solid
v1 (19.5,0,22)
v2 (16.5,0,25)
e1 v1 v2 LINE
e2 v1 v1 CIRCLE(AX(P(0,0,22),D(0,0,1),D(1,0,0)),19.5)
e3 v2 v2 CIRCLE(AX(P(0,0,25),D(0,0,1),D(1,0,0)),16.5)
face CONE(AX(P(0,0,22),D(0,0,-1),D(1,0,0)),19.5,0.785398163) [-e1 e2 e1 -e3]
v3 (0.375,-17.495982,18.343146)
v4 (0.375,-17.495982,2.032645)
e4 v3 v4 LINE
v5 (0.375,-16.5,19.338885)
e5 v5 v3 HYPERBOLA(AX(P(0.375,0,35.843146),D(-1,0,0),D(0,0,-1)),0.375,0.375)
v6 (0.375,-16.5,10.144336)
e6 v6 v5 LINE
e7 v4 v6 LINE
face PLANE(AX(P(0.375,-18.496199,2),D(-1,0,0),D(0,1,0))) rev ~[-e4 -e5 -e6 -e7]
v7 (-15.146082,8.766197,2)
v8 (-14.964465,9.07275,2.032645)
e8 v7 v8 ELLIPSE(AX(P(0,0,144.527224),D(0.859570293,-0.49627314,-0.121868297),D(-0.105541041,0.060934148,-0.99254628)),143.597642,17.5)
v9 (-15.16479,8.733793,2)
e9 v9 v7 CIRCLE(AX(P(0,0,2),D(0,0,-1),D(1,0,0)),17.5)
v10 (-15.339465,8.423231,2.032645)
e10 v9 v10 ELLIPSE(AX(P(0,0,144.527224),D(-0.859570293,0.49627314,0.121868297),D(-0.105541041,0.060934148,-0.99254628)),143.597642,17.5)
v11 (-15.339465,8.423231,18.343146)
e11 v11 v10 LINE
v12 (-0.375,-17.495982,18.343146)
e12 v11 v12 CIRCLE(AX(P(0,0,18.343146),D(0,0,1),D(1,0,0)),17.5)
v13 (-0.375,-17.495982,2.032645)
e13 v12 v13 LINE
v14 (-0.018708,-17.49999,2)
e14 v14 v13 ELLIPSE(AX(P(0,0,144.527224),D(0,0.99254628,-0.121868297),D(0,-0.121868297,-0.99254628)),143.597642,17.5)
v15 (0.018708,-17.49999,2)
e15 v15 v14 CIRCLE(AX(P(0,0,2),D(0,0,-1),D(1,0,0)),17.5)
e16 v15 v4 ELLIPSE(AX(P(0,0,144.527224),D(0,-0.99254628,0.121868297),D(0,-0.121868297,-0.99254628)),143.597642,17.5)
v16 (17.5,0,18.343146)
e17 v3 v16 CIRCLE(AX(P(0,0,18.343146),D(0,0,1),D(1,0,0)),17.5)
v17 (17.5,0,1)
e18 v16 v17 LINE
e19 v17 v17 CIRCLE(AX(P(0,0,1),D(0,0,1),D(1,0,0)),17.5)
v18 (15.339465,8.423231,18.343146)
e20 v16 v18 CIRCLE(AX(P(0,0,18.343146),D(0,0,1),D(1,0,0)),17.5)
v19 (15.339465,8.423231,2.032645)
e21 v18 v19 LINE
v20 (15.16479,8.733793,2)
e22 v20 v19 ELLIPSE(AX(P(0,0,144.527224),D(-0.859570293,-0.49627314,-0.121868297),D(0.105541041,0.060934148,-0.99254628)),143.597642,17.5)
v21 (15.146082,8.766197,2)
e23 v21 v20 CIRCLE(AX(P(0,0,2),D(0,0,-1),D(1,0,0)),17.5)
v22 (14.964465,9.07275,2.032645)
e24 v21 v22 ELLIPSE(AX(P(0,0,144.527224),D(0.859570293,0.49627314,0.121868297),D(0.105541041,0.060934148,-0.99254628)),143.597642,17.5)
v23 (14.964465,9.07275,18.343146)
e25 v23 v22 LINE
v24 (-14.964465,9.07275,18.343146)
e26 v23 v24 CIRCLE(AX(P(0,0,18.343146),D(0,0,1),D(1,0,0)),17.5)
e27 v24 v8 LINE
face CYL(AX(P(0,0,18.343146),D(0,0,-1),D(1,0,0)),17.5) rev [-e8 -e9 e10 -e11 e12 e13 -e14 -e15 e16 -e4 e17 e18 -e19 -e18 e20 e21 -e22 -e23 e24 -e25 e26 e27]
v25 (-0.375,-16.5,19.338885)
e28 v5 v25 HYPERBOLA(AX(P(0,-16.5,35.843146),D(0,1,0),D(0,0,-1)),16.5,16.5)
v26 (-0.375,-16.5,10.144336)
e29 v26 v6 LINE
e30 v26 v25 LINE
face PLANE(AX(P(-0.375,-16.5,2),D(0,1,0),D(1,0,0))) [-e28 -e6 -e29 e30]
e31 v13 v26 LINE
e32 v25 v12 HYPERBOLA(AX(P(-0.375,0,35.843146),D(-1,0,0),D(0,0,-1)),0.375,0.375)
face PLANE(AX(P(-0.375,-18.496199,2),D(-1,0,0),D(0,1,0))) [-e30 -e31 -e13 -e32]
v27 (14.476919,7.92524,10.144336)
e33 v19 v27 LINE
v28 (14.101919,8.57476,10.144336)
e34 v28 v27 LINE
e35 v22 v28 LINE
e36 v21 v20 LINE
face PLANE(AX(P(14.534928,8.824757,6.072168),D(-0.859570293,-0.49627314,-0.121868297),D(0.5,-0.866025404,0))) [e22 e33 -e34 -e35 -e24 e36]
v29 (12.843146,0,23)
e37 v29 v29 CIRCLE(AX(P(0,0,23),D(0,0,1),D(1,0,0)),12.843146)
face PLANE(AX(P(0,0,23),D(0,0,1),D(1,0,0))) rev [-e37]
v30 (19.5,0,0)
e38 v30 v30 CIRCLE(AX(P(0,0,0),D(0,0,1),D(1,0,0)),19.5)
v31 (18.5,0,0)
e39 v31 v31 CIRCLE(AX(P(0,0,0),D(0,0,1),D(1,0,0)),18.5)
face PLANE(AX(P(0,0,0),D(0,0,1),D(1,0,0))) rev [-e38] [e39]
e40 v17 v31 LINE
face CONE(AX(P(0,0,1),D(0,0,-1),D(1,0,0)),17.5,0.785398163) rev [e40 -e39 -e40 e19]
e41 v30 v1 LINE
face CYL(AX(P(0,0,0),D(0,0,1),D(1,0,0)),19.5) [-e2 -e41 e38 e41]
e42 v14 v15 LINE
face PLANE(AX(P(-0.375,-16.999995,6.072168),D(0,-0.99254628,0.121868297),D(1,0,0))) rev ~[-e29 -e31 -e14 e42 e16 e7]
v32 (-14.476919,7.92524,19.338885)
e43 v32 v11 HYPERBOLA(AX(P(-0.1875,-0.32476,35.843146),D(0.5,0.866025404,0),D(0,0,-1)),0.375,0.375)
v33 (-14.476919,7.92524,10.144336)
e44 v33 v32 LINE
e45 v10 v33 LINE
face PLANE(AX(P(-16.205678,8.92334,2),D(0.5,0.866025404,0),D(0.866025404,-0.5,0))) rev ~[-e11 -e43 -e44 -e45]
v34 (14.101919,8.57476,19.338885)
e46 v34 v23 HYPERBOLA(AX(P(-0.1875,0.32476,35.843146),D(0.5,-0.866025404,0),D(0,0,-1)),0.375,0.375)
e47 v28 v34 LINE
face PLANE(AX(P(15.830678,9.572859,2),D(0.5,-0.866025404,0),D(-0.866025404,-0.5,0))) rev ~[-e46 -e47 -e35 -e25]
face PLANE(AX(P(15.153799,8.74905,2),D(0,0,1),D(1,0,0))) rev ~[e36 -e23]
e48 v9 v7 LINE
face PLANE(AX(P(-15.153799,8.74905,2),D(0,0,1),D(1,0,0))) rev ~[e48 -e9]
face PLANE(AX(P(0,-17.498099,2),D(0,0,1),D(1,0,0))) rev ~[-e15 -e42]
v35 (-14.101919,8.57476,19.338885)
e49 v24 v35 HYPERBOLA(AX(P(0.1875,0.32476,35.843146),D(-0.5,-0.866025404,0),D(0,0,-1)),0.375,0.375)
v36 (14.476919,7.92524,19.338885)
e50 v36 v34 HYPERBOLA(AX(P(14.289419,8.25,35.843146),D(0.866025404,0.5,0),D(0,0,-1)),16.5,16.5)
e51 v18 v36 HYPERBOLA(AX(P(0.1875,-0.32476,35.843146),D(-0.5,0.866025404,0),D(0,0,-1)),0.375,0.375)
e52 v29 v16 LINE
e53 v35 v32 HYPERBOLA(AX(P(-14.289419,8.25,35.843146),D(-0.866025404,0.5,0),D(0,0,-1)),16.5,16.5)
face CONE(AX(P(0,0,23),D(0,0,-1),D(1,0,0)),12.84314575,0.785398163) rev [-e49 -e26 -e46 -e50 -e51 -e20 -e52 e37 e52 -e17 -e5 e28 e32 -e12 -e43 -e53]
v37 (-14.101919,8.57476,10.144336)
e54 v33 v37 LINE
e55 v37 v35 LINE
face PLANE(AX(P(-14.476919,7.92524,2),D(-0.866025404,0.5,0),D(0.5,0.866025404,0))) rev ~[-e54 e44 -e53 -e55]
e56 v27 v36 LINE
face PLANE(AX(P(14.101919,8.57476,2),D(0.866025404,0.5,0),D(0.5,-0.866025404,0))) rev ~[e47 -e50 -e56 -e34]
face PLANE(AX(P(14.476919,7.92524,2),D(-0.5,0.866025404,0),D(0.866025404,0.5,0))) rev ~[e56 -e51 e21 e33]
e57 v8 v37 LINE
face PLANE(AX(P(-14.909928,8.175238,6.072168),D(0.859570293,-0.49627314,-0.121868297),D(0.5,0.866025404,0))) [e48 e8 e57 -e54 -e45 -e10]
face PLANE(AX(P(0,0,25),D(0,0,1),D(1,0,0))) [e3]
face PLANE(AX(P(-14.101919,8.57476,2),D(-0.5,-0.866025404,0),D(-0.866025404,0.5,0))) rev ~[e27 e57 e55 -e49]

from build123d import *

# Parameters (mm, degrees)
F3_W       = 0.75
F3_H       = 1.9961989338
F5_SIZE2   = 8.144336
F5_SIZE    = 0.99999
F5_2_SIZE2 = 8.144336
F5_2_SIZE  = 0.99999
F5_3_SIZE2 = 8.144336
F5_3_SIZE  = 0.99999


# Not quite as in the source:
# - a fillet or chamfer is up to 0.001 mm smaller than in the source, because OpenCascade refuses the exact size


with BuildPart() as f1:
    # F0 (on Front) → F1 (revolve)
    with BuildSketch(Plane.XZ):
        Polygon((16.5, 25), (0, 25), (0, 23), (12.8431457505, 23), (17.5, 18.3431457505), (17.5, 1), (18.5, 0), (19.5, 0), (19.5, 22), align=None)
    revolve(axis=Axis((0, 0, 16.9686058983), (0, 0, 1)))

    # F3 (on offset) → F4 (join, up to the next surface of F1)
    with BuildSketch(Plane.XY.offset(2)):
        with Locations((0, -17.4980994669)):
            Rectangle(F3_W, F3_H)
        Polygon((16.2056781502, 8.9233399405), (15.8306781502, 9.5728589933), (14.1019191624, 8.5747595264), (14.4769191624, 7.9252404736), align=None)
        Polygon((-15.8306781502, 9.5728589933), (-16.2056781502, 8.9233399405), (-14.4769191624, 7.9252404736), (-14.1019191624, 8.5747595264), align=None)
    extrude(until=Until.NEXT)

    # F5 (size 1 and 8.144346428 in the source; OpenCascade refuses exactly that, so slightly less here)
    f5_edges = [f1.edges().sort_by_distance(p)[0] for p in [
        (0, -16.5, 2),
    ]]
    f5_side = f1.faces().sort_by_distance((0, -16.999331, 2))[0]
    chamfer(f5_edges, length=F5_SIZE, length2=F5_SIZE2, reference=f5_side)

    # F5#2 (size 1 and 8.144346428 in the source; OpenCascade refuses exactly that, so slightly less here)
    f5_2_edges = [f1.edges().sort_by_distance(p)[0] for p in [
        (14.289419, 8.25, 2),
    ]]
    f5_2_side = f1.faces().sort_by_distance((14.721853, 8.499666, 2))[0]
    chamfer(f5_2_edges, length=F5_2_SIZE, length2=F5_2_SIZE2, reference=f5_2_side)

    # F5#3 (size 1 and 8.144346428 in the source; OpenCascade refuses exactly that, so slightly less here)
    f5_3_edges = [f1.edges().sort_by_distance(p)[0] for p in [
        (-14.289419, 8.25, 2),
    ]]
    f5_3_side = f1.faces().sort_by_distance((-14.721853, 8.499666, 2))[0]
    chamfer(f5_3_edges, length=F5_3_SIZE, length2=F5_3_SIZE2, reference=f5_3_side)


solid = f1.part
